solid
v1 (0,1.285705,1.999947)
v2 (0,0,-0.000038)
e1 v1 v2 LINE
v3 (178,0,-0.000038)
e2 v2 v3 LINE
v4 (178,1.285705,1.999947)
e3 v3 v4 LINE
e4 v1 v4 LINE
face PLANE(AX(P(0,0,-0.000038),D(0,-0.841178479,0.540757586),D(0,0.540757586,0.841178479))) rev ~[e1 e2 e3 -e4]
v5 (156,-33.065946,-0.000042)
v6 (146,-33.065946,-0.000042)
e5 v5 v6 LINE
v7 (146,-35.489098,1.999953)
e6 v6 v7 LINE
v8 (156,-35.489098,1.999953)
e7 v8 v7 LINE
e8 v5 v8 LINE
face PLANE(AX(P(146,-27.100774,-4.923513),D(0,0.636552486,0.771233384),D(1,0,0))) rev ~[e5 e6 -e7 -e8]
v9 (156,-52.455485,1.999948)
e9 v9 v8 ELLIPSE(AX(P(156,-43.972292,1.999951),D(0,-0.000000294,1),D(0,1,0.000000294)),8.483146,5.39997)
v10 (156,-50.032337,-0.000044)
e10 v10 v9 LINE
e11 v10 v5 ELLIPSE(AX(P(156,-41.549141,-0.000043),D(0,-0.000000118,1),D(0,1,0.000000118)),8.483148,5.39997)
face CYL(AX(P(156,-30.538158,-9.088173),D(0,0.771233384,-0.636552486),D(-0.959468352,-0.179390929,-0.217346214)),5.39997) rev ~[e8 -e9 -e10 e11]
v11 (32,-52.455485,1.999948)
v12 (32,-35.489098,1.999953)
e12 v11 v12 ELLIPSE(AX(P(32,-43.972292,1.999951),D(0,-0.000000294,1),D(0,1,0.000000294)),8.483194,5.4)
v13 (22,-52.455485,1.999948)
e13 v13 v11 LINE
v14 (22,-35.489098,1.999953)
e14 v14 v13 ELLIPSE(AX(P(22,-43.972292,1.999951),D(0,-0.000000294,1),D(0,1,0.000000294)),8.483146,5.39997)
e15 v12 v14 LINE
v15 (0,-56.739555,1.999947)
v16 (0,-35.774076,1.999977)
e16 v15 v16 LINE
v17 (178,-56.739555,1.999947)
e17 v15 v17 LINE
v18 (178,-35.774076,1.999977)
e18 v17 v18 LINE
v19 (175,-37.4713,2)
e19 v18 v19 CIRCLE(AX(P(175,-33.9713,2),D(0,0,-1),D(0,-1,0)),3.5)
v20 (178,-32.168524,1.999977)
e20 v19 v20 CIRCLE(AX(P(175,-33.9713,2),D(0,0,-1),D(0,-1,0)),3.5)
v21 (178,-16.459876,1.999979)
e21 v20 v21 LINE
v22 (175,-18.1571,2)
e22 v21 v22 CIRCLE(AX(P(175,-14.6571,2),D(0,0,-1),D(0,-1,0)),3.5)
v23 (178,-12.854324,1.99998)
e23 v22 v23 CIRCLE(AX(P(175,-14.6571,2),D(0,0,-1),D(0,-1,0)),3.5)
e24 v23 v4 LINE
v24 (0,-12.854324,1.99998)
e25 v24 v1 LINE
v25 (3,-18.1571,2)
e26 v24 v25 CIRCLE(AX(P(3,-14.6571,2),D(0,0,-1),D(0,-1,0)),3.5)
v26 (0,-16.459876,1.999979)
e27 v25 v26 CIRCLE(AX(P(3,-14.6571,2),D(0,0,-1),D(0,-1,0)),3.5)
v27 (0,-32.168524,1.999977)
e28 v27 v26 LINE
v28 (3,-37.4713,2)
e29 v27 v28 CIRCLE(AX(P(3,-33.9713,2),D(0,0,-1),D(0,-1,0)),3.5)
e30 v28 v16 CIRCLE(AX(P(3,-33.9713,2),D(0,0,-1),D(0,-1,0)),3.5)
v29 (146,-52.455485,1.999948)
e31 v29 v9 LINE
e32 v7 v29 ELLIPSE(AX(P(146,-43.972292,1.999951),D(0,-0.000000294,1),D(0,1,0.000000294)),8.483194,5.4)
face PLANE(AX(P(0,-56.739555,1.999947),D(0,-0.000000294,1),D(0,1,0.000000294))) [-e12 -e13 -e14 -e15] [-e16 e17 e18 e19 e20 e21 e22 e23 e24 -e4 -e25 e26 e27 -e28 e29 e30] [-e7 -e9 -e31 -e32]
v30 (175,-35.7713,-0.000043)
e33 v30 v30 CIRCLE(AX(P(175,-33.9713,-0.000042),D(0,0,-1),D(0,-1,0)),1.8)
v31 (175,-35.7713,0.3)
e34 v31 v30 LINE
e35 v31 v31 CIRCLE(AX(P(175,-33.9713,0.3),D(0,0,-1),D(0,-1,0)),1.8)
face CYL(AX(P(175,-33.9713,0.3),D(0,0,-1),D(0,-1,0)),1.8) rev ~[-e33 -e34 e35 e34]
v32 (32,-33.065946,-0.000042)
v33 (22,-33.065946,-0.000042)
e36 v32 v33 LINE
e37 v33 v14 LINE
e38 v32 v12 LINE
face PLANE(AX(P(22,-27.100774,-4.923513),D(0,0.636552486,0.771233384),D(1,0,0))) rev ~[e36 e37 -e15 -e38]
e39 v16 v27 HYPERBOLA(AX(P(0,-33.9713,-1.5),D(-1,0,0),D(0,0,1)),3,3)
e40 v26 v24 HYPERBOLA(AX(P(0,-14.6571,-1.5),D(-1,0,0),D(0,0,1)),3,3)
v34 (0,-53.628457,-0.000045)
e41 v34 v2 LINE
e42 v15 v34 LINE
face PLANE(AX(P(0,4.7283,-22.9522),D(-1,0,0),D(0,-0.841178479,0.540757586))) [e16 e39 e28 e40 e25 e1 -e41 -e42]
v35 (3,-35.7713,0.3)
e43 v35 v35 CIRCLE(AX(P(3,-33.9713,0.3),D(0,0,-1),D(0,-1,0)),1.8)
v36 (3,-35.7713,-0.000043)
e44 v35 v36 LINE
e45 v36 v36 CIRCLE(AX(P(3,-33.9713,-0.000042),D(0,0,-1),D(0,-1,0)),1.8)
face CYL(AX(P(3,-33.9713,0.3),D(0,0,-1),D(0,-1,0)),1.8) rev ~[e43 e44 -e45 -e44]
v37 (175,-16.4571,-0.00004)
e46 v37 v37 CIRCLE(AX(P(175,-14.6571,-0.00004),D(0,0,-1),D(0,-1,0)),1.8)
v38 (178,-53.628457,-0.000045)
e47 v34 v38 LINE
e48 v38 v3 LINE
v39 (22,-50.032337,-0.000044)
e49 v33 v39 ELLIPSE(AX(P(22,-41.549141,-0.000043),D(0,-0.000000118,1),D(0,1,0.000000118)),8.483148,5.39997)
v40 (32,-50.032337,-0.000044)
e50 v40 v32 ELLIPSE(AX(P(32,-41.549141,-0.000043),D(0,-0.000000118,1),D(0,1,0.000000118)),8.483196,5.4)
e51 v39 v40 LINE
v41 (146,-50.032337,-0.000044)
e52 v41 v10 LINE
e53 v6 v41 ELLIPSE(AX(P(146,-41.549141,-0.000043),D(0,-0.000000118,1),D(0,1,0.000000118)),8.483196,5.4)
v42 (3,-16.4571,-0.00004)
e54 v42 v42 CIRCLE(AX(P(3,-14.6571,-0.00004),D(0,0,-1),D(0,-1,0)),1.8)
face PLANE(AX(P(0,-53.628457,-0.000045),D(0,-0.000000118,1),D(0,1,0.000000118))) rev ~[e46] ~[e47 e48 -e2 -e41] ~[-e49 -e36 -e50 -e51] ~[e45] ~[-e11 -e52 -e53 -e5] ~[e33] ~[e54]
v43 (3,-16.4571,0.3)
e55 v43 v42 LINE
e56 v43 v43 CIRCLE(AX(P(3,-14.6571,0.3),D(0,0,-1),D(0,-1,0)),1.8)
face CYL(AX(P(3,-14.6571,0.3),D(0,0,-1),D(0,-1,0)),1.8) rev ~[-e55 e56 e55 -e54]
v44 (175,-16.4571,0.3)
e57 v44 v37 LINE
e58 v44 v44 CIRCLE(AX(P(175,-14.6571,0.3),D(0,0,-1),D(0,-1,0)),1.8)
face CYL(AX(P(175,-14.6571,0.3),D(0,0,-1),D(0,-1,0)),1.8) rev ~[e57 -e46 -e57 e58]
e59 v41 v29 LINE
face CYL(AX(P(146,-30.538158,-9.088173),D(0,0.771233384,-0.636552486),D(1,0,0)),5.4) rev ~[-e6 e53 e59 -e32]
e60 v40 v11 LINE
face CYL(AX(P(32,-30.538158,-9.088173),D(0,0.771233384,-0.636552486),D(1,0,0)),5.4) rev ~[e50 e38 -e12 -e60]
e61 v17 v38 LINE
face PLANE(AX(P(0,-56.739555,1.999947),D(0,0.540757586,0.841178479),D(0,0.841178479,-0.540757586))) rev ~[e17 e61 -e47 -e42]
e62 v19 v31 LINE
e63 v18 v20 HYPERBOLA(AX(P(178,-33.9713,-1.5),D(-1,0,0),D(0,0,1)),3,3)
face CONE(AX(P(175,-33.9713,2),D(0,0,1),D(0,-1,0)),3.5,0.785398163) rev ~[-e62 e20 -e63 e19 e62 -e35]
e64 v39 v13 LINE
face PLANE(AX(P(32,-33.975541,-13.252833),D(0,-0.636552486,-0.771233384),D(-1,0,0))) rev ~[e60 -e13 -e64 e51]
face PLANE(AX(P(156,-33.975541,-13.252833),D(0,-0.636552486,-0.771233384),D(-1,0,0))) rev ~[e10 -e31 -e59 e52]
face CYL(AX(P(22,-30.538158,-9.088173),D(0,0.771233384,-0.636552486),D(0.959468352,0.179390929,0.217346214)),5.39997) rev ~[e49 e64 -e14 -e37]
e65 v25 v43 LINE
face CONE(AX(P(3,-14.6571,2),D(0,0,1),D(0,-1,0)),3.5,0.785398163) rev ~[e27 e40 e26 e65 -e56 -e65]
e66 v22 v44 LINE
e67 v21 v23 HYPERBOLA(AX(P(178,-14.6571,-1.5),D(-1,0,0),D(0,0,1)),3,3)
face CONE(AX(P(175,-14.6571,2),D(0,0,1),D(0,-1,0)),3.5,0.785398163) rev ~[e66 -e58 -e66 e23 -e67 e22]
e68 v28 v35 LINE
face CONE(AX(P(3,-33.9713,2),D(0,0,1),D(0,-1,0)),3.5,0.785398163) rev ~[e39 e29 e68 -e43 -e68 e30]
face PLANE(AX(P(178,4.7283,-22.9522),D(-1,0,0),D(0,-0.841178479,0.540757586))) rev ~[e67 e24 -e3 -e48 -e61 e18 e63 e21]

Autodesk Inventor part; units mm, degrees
ref_plane "YZ Plane" through (0, 0, 0) normal (1, 0, 0) x (0, 1, 0)
ref_plane "XZ Plane" through (0, 0, 0) normal (0, 1, 0) x (-1, 0, 0)
ref_plane "Work Plane1" through (0, 4.7283, -22.9522) normal (-1, 0, 0) x (0, -0.8411785, 0.5407576)
sketch "Sketch1" plane through (0, 4.7283, -22.9522) normal (-1, 0, 0) x (0, -0.8411785, 0.5407576)
  line L0 (-61.5, -16.75) -> (-59.949, -16.75) projected
  line L1 (61.5, -12.25) -> (61.5, -16.75) projected
  line L2 (61.5, -16.75) -> (65.5, -16.75) projected
  line L3 (65.5, -16.75) -> (65.5, -20.25) projected
  line L4 (65.5, -20.25) -> (79.5, -20.25) projected
  line L5 (79.5, -20.25) -> (65.5, -11.25) projected
  line L6 (65.5, -11.25) -> (65.5, -12.25) projected
  line L7 (65.5, -12.25) -> (61.5, -12.25) projected
  line L8 (16.3889, 16.75) -> (16.3889, 18.75) projected
  line L9 (14.3494, 18.75) -> (16.3889, 18.75) projected
  line L10 (65.1985, -12.25) -> (12.6206, 21.5501)
  line L11 (16.3889, 16.75) -> (16.3889, 19.1276)
  arc A0 (-61.5, -15.199) -> (-59.949, -16.75) centre (-58.75, -14) ccw projected
  line L12 (-61.5, -15.199) -> (-61.5, -16.75) projected
  arc A1 (-57.551, -16.75) -> (-61.5, -12.801) centre (-58.75, -14) ccw projected
  line L13 (-57.551, -16.75) -> (-36.699, -16.75) projected
  arc A2 (-34.301, -16.75) -> (-36.699, -16.75) centre (-35.5, -14) ccw projected
  line L14 (-34.301, -16.75) -> (61.5, -16.75) projected
  line L15 (61.5, -16.75) -> (61.5, -12.25) projected
  line L16 (61.5, -12.25) -> (16.3889, 16.75) projected
  line L17 (16.3889, 16.75) -> (-61.5, 16.75) projected
  line L18 (-61.5, 16.75) -> (-61.5, -12.801) projected
  dimension "d14" = 2
ref_plane "Work Plane2" through (178, -56.0619, -70.2985) normal (1, 0, 0) x (0, 0.8411785, -0.5407576)
extrude "Extrusion1" add sketch "Sketch1" against normal up to surface (178 mm away) contours L16 L8 L11 L10 L7
sketch "Sketch2" plane through (0, -56.7396, 2) normal (0, 0, 1) x (1, 0, 0)
  circle A0 centre (3, 22.7682) radius 2.5 projected
  circle A1 centre (3, 42.0825) radius 2.5 projected
  line L0 (0, 3.1111) -> (0, 56.7396) projected
  line L1 (0, 3.1111) -> (6, 3.1111) projected
  line L2 (6, 56.7396) -> (6, 3.1111) projected
  line L3 (0, 56.7396) -> (6, 56.7396) projected
  circle A2 centre (175, 22.7682) radius 2.5 projected
  circle A3 centre (175, 42.0825) radius 2.5 projected
  line L4 (178, 3.1111) -> (178, 56.7396) projected
  line L5 (178, 56.7396) -> (172, 56.7396) projected
  line L6 (172, 56.7396) -> (172, 3.1111) projected
  line L7 (178, 3.1111) -> (172, 3.1111) projected
hole "Hole1" at (3, -14.6571, 2) at (3, -33.9713, 2) at (175, -33.9713, 2) at (175, -14.6571, 2) direction (0, 0, -1) diameter 3.6 end through all countersink diameter 7 countersink angle 90 clearance for "Countersunk Flat Head Screw ISO 2009/7046" size "M3" standard "ISO"
ref_plane "Work Plane3" through (22, -30.5397, -9.0869) normal (0, -0.7712334, 0.6365525) x (1, 0, 0)
sketch "Sketch3" plane through (22, -30.5397, -9.0869) normal (0, -0.7712334, 0.6365525) x (1, 0, 0)
  line L0 (-9.9215, 5.4518) -> (-9.9215, -5.4534)
  spline S0 degree 3 poles (-9.9215, -5.4534) (-9.9222, -5.5772) (-9.8204, -5.8209) (-9.5772, -5.9222) (-9.4534, -5.9215) knots 0 0 0 0 0.5 1 1 1 1
  line L1 (-9.4534, -5.9215) -> (19.4534, -5.9215)
  spline S1 degree 3 poles (19.4534, -5.9215) (19.5775, -5.9222) (19.8219, -5.82) (19.9222, -5.5758) (19.9215, -5.4518) knots 0 0 0 0 0.5 1 1 1 1
  line L2 (19.9215, -5.4518) -> (19.9215, 5.4534)
  spline S2 degree 3 poles (19.9215, 5.4534) (19.9222, 5.5775) (19.82, 5.8219) (19.5758, 5.9222) (19.4518, 5.9215) knots 0 0 0 0 0.5 1 1 1 1
  line L3 (19.4518, 5.9215) -> (-9.4534, 5.9215)
  spline S3 degree 3 poles (-9.4534, 5.9215) (-9.5775, 5.9222) (-9.8219, 5.82) (-9.9222, 5.5758) (-9.9215, 5.4518) knots 0 0 0 0 0.5 1 1 1 1
  circle A0 centre (-8.3791, -4.3791) radius 0.5
  circle A1 centre (-8.3791, 4.3791) radius 0.5
  circle A2 centre (18.3791, 4.3791) radius 0.5
  circle A3 centre (18.3791, -4.3791) radius 0.5
  arc A4 (5.2617, -1.4512) -> (5.1811, -1.5218) centre (5.2771, -1.55) ccw
  arc A5 (5.1811, 1.5218) -> (5.1811, -1.5218) centre (0, 0) ccw
  arc A6 (5.1811, 1.5218) -> (5.2617, 1.4512) centre (5.2771, 1.55) ccw
  arc A7 (5.2617, 1.4512) -> (5.3414, 1.519) centre (5.2463, 1.55) ccw
  arc A8 (5.3414, -1.519) -> (5.3414, 1.519) centre (10, 0) ccw
  arc A9 (5.3414, -1.519) -> (5.2617, -1.4512) centre (5.2463, -1.55) ccw
  line L4 (143.9215, 5.4518) -> (143.9215, -5.4534)
  spline S4 degree 3 poles (143.4534, 5.9215) (143.5775, 5.9222) (143.8219, 5.82) (143.9222, 5.5758) (143.9215, 5.4518) knots 0 0 0 0 0.5 1 1 1 1
  line L5 (114.5482, 5.9215) -> (143.4534, 5.9215)
  spline S5 degree 3 poles (114.0785, 5.4534) (114.0778, 5.5775) (114.18, 5.8219) (114.4242, 5.9222) (114.5482, 5.9215) knots 0 0 0 0 0.5 1 1 1 1
  line L6 (114.0785, -5.4518) -> (114.0785, 5.4534)
  spline S6 degree 3 poles (114.5466, -5.9215) (114.4225, -5.9222) (114.1781, -5.82) (114.0778, -5.5758) (114.0785, -5.4518) knots 0 0 0 0 0.5 1 1 1 1
  line L7 (143.4534, -5.9215) -> (114.5466, -5.9215)
  spline S7 degree 3 poles (143.9215, -5.4534) (143.9222, -5.5772) (143.8204, -5.8209) (143.5772, -5.9222) (143.4534, -5.9215) knots 0 0 0 0 0.5 1 1 1 1
  circle A10 centre (142.3791, -4.3791) radius 0.5
  circle A11 centre (142.3791, 4.3791) radius 0.5
  circle A12 centre (115.6209, 4.3791) radius 0.5
  circle A13 centre (115.6209, -4.3791) radius 0.5
  arc A14 (128.8189, -1.5218) -> (128.7383, -1.4512) centre (128.7229, -1.55) ccw
  arc A15 (128.7383, -1.4512) -> (128.6586, -1.519) centre (128.7537, -1.55) ccw
  arc A16 (128.6586, 1.519) -> (128.6586, -1.519) centre (124, 0) ccw
  arc A17 (128.6586, 1.519) -> (128.7383, 1.4512) centre (128.7537, 1.55) ccw
  arc A18 (128.7383, 1.4512) -> (128.8189, 1.5218) centre (128.7229, 1.55) ccw
  arc A19 (128.8189, -1.5218) -> (128.8189, 1.5218) centre (134, 0) ccw
  circle A20 centre (10, 0) radius 5.4
  circle A21 centre (124, 0) radius 5.4
  line L8 (0, 5.4) -> (10, 5.4)
  line L9 (10, -5.4) -> (0, -5.4)
  line L10 (124, 5.4) -> (134, 5.4)
  line L11 (134, -5.4) -> (124, -5.4)
  point P0 (-22, 26.4483)
  dimension "d9" = 10.8
  dimension "d10" = 10.8
extrude "Extrusion2" cut sketch "Sketch3" along normal blind 78.25 contours A9 A8 A7 A6 A5 A20 A4 | A4 A5 A20 A6 A7 A8 A9 | A20 L9 A5 | A5 A20 | A5 L8 A20 | A19 A21 A18 A17 A16 A15 A14 | A14 A15 A16 A17 A18 A19 A21 | A21 A19 | A19 L11 A21 | A19 A21 L10
properties part number "front"
